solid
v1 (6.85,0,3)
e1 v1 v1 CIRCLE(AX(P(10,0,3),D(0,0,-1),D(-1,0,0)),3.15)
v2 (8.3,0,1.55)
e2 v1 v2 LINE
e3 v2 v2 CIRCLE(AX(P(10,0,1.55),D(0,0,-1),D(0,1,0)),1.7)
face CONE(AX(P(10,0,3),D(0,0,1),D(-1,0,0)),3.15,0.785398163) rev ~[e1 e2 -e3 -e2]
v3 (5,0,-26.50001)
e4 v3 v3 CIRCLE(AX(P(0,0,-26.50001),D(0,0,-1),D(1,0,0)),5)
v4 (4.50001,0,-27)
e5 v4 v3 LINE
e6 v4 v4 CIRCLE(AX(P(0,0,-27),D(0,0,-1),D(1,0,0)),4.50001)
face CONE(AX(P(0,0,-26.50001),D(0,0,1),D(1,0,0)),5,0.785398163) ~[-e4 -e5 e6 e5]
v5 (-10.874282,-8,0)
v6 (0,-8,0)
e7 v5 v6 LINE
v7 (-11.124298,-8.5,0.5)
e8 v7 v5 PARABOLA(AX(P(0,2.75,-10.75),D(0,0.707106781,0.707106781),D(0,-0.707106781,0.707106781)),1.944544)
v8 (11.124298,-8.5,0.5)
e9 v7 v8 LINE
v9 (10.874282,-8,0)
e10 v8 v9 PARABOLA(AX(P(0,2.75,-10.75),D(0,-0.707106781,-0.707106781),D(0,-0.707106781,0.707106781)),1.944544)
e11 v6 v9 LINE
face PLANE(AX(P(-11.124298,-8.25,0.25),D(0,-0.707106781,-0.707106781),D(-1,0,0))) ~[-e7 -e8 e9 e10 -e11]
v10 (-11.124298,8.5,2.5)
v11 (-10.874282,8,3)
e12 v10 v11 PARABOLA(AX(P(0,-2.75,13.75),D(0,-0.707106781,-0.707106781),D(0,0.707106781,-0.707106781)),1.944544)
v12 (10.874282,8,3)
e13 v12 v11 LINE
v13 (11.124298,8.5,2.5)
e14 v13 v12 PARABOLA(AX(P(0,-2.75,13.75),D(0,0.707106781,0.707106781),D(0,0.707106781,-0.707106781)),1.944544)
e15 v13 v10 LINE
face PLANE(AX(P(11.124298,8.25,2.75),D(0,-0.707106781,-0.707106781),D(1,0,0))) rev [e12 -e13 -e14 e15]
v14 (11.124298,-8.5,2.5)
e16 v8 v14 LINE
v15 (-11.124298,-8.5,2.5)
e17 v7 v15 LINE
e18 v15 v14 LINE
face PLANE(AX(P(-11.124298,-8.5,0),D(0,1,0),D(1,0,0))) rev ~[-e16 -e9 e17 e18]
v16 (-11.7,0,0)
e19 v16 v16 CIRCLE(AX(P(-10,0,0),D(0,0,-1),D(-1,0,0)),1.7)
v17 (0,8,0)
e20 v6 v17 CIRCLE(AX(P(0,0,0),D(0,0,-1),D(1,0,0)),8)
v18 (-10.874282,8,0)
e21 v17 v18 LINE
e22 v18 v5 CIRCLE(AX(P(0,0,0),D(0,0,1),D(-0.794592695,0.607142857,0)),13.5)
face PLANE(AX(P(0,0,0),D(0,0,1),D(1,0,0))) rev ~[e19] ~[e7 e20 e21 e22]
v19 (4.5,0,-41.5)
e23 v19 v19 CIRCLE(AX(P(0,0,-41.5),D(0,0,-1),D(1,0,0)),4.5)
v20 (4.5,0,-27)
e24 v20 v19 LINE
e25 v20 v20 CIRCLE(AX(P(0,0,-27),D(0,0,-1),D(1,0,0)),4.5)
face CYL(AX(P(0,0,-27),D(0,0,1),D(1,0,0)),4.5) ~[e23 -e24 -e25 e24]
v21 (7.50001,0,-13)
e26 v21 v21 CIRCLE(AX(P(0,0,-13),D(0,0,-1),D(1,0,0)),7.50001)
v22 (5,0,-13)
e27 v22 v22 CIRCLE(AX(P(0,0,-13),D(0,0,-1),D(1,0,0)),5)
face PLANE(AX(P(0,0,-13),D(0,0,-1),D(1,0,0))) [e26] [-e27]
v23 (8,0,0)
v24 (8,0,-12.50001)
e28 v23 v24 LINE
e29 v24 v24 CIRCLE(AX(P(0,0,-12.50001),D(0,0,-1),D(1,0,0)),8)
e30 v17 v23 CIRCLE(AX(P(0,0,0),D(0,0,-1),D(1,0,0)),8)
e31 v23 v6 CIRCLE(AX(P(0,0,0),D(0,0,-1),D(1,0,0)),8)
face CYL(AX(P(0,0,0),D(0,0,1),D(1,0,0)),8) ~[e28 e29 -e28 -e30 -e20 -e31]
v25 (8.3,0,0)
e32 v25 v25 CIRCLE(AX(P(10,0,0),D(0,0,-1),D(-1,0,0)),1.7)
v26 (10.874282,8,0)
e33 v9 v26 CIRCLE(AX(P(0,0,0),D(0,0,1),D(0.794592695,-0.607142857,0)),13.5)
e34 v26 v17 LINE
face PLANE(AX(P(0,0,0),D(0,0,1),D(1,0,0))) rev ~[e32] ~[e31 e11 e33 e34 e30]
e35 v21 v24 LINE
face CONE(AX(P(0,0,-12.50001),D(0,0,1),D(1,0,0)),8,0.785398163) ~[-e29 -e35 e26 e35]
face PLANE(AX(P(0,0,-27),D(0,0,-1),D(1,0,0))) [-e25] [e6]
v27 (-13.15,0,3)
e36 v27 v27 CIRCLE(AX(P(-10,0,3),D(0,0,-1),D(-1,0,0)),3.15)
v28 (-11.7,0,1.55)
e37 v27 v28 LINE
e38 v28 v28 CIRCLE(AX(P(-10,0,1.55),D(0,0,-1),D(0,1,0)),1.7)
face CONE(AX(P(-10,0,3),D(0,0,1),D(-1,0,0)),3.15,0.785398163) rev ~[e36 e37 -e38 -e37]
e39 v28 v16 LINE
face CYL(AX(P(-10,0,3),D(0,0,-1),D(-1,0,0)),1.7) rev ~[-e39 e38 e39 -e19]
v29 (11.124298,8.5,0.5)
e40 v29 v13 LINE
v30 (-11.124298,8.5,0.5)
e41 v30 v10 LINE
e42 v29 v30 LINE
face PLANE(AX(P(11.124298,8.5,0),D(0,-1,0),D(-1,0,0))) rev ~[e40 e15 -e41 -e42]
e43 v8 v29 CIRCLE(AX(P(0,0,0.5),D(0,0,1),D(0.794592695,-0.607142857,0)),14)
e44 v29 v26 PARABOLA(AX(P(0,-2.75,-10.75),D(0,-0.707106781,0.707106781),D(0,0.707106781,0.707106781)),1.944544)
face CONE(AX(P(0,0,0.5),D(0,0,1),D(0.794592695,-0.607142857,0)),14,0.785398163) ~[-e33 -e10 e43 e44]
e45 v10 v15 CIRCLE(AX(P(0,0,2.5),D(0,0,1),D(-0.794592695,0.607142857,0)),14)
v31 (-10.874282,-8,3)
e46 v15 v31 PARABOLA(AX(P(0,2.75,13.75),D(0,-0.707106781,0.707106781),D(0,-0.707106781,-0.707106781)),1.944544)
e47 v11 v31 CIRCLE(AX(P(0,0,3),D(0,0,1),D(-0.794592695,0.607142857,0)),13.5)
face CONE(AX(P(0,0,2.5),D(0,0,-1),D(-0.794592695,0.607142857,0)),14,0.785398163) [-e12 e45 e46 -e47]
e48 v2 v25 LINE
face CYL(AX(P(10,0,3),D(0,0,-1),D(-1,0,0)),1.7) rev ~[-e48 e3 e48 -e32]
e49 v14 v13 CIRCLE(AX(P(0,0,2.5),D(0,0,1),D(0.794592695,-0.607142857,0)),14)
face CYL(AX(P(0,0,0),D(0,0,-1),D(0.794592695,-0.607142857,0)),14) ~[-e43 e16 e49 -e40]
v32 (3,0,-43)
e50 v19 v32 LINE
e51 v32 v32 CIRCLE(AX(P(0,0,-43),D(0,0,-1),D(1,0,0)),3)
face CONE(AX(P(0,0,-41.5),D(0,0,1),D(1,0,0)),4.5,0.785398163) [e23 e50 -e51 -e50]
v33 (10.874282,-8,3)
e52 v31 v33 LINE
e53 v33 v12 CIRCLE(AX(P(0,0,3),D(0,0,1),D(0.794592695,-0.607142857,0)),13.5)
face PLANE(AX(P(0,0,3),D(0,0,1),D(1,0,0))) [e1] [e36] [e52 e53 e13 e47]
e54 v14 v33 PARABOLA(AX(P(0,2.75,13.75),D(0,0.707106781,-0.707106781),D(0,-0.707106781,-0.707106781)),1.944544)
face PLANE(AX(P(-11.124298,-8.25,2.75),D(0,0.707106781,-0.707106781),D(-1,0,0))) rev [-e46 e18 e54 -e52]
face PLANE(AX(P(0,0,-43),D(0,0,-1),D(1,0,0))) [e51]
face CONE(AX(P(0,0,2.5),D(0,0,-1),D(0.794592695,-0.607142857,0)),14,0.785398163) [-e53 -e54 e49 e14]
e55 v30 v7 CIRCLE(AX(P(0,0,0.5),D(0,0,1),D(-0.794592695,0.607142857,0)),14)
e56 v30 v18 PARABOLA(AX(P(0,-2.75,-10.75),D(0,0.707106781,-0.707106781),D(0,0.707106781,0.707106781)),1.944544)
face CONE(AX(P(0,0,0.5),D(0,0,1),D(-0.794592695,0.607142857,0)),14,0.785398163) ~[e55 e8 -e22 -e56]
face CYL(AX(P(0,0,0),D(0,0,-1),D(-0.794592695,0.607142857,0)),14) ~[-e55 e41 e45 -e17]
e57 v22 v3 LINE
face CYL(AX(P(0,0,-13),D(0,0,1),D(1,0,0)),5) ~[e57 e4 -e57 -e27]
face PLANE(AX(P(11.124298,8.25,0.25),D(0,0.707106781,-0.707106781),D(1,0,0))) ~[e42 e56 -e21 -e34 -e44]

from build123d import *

# Parameters (mm, degrees)
F1_DEPTH       = 3
F2_SIZE        = 0.5
F4_D           = 3.4
F4_CSINK_D     = 6.3
F4_CSINK_ANGLE = 90
F5_R           = 8
F6_DEPTH       = 13
F7_R           = 5
F8_DEPTH       = 14
F9_R           = 4.5
F10_DEPTH      = 16
F11_SIZE       = 1.5
F12_SIZE       = 0.49999


# Not quite as in the source:
# - a fillet or chamfer is up to 0.001 mm smaller than in the source, because OpenCascade refuses the exact size


with BuildPart() as f1:
    # F0 (on Top) → F1 (new body)
    with BuildSketch(Plane.XY):
        with BuildLine():
            Line((11.1242977306, 8.5), (-11.1242977306, 8.5))
            ThreePointArc((-11.1242977306, 8.5), (-14, 0), (-11.1242977306, -8.5))
            Line((-11.1242977306, -8.5), (11.1242977306, -8.5))
            ThreePointArc((11.1242977306, -8.5), (14, 0), (11.1242977306, 8.5))
        make_face()
    extrude(amount=F1_DEPTH)

    # F2
    f2_edges = [f1.edges().sort_by_distance(p)[0] for p in [
        (0, -8.5, 3),
        (14, 0, 3),
        (0, 8.5, 3),
        (-14, 0, 3),
        (0, -8.5, 0),
        (14, 0, 0),
        (0, 8.5, 0),
        (-14, 0, 0),
    ]]
    chamfer(f2_edges, length=F2_SIZE)

    # F4 (through all)
    with Locations(Plane.XY.offset(3)):
        with Locations((-10, 0), (10, 0)):
            CounterSinkHole(F4_D / 2, F4_CSINK_D / 2, counter_sink_angle=F4_CSINK_ANGLE)

    # F5 (on face) → F6 (join)
    with BuildSketch(Plane(origin=(0, 0, 0), x_dir=(1, 0, 0), z_dir=(0, 0, -1))):
        Circle(F5_R)
    extrude(amount=F6_DEPTH)

    # F7 (on face) → F8 (join)
    with BuildSketch(Plane(origin=(0, 0, -13), x_dir=(1, 0, 0), z_dir=(0, 0, -1))):
        Circle(F7_R)
    extrude(amount=F8_DEPTH)

    # F9 (on face) → F10 (join)
    with BuildSketch(Plane(origin=(0, 0, -27), x_dir=(1, 0, 0), z_dir=(0, 0, -1))):
        Circle(F9_R)
    extrude(amount=F10_DEPTH)

    # F11
    f11_edges = [f1.edges().sort_by_distance(p)[0] for p in [
        (-4.5, 0, -43),
    ]]
    chamfer(f11_edges, length=F11_SIZE)

    # F12 (size 0.5 in the source; OpenCascade refuses exactly that, so slightly less here)
    f12_edges = [f1.edges().sort_by_distance(p)[0] for p in [
        (-5, 0, -27),
        (-8, 0, -13),
    ]]
    chamfer(f12_edges, length=F12_SIZE)


solid = f1.part
